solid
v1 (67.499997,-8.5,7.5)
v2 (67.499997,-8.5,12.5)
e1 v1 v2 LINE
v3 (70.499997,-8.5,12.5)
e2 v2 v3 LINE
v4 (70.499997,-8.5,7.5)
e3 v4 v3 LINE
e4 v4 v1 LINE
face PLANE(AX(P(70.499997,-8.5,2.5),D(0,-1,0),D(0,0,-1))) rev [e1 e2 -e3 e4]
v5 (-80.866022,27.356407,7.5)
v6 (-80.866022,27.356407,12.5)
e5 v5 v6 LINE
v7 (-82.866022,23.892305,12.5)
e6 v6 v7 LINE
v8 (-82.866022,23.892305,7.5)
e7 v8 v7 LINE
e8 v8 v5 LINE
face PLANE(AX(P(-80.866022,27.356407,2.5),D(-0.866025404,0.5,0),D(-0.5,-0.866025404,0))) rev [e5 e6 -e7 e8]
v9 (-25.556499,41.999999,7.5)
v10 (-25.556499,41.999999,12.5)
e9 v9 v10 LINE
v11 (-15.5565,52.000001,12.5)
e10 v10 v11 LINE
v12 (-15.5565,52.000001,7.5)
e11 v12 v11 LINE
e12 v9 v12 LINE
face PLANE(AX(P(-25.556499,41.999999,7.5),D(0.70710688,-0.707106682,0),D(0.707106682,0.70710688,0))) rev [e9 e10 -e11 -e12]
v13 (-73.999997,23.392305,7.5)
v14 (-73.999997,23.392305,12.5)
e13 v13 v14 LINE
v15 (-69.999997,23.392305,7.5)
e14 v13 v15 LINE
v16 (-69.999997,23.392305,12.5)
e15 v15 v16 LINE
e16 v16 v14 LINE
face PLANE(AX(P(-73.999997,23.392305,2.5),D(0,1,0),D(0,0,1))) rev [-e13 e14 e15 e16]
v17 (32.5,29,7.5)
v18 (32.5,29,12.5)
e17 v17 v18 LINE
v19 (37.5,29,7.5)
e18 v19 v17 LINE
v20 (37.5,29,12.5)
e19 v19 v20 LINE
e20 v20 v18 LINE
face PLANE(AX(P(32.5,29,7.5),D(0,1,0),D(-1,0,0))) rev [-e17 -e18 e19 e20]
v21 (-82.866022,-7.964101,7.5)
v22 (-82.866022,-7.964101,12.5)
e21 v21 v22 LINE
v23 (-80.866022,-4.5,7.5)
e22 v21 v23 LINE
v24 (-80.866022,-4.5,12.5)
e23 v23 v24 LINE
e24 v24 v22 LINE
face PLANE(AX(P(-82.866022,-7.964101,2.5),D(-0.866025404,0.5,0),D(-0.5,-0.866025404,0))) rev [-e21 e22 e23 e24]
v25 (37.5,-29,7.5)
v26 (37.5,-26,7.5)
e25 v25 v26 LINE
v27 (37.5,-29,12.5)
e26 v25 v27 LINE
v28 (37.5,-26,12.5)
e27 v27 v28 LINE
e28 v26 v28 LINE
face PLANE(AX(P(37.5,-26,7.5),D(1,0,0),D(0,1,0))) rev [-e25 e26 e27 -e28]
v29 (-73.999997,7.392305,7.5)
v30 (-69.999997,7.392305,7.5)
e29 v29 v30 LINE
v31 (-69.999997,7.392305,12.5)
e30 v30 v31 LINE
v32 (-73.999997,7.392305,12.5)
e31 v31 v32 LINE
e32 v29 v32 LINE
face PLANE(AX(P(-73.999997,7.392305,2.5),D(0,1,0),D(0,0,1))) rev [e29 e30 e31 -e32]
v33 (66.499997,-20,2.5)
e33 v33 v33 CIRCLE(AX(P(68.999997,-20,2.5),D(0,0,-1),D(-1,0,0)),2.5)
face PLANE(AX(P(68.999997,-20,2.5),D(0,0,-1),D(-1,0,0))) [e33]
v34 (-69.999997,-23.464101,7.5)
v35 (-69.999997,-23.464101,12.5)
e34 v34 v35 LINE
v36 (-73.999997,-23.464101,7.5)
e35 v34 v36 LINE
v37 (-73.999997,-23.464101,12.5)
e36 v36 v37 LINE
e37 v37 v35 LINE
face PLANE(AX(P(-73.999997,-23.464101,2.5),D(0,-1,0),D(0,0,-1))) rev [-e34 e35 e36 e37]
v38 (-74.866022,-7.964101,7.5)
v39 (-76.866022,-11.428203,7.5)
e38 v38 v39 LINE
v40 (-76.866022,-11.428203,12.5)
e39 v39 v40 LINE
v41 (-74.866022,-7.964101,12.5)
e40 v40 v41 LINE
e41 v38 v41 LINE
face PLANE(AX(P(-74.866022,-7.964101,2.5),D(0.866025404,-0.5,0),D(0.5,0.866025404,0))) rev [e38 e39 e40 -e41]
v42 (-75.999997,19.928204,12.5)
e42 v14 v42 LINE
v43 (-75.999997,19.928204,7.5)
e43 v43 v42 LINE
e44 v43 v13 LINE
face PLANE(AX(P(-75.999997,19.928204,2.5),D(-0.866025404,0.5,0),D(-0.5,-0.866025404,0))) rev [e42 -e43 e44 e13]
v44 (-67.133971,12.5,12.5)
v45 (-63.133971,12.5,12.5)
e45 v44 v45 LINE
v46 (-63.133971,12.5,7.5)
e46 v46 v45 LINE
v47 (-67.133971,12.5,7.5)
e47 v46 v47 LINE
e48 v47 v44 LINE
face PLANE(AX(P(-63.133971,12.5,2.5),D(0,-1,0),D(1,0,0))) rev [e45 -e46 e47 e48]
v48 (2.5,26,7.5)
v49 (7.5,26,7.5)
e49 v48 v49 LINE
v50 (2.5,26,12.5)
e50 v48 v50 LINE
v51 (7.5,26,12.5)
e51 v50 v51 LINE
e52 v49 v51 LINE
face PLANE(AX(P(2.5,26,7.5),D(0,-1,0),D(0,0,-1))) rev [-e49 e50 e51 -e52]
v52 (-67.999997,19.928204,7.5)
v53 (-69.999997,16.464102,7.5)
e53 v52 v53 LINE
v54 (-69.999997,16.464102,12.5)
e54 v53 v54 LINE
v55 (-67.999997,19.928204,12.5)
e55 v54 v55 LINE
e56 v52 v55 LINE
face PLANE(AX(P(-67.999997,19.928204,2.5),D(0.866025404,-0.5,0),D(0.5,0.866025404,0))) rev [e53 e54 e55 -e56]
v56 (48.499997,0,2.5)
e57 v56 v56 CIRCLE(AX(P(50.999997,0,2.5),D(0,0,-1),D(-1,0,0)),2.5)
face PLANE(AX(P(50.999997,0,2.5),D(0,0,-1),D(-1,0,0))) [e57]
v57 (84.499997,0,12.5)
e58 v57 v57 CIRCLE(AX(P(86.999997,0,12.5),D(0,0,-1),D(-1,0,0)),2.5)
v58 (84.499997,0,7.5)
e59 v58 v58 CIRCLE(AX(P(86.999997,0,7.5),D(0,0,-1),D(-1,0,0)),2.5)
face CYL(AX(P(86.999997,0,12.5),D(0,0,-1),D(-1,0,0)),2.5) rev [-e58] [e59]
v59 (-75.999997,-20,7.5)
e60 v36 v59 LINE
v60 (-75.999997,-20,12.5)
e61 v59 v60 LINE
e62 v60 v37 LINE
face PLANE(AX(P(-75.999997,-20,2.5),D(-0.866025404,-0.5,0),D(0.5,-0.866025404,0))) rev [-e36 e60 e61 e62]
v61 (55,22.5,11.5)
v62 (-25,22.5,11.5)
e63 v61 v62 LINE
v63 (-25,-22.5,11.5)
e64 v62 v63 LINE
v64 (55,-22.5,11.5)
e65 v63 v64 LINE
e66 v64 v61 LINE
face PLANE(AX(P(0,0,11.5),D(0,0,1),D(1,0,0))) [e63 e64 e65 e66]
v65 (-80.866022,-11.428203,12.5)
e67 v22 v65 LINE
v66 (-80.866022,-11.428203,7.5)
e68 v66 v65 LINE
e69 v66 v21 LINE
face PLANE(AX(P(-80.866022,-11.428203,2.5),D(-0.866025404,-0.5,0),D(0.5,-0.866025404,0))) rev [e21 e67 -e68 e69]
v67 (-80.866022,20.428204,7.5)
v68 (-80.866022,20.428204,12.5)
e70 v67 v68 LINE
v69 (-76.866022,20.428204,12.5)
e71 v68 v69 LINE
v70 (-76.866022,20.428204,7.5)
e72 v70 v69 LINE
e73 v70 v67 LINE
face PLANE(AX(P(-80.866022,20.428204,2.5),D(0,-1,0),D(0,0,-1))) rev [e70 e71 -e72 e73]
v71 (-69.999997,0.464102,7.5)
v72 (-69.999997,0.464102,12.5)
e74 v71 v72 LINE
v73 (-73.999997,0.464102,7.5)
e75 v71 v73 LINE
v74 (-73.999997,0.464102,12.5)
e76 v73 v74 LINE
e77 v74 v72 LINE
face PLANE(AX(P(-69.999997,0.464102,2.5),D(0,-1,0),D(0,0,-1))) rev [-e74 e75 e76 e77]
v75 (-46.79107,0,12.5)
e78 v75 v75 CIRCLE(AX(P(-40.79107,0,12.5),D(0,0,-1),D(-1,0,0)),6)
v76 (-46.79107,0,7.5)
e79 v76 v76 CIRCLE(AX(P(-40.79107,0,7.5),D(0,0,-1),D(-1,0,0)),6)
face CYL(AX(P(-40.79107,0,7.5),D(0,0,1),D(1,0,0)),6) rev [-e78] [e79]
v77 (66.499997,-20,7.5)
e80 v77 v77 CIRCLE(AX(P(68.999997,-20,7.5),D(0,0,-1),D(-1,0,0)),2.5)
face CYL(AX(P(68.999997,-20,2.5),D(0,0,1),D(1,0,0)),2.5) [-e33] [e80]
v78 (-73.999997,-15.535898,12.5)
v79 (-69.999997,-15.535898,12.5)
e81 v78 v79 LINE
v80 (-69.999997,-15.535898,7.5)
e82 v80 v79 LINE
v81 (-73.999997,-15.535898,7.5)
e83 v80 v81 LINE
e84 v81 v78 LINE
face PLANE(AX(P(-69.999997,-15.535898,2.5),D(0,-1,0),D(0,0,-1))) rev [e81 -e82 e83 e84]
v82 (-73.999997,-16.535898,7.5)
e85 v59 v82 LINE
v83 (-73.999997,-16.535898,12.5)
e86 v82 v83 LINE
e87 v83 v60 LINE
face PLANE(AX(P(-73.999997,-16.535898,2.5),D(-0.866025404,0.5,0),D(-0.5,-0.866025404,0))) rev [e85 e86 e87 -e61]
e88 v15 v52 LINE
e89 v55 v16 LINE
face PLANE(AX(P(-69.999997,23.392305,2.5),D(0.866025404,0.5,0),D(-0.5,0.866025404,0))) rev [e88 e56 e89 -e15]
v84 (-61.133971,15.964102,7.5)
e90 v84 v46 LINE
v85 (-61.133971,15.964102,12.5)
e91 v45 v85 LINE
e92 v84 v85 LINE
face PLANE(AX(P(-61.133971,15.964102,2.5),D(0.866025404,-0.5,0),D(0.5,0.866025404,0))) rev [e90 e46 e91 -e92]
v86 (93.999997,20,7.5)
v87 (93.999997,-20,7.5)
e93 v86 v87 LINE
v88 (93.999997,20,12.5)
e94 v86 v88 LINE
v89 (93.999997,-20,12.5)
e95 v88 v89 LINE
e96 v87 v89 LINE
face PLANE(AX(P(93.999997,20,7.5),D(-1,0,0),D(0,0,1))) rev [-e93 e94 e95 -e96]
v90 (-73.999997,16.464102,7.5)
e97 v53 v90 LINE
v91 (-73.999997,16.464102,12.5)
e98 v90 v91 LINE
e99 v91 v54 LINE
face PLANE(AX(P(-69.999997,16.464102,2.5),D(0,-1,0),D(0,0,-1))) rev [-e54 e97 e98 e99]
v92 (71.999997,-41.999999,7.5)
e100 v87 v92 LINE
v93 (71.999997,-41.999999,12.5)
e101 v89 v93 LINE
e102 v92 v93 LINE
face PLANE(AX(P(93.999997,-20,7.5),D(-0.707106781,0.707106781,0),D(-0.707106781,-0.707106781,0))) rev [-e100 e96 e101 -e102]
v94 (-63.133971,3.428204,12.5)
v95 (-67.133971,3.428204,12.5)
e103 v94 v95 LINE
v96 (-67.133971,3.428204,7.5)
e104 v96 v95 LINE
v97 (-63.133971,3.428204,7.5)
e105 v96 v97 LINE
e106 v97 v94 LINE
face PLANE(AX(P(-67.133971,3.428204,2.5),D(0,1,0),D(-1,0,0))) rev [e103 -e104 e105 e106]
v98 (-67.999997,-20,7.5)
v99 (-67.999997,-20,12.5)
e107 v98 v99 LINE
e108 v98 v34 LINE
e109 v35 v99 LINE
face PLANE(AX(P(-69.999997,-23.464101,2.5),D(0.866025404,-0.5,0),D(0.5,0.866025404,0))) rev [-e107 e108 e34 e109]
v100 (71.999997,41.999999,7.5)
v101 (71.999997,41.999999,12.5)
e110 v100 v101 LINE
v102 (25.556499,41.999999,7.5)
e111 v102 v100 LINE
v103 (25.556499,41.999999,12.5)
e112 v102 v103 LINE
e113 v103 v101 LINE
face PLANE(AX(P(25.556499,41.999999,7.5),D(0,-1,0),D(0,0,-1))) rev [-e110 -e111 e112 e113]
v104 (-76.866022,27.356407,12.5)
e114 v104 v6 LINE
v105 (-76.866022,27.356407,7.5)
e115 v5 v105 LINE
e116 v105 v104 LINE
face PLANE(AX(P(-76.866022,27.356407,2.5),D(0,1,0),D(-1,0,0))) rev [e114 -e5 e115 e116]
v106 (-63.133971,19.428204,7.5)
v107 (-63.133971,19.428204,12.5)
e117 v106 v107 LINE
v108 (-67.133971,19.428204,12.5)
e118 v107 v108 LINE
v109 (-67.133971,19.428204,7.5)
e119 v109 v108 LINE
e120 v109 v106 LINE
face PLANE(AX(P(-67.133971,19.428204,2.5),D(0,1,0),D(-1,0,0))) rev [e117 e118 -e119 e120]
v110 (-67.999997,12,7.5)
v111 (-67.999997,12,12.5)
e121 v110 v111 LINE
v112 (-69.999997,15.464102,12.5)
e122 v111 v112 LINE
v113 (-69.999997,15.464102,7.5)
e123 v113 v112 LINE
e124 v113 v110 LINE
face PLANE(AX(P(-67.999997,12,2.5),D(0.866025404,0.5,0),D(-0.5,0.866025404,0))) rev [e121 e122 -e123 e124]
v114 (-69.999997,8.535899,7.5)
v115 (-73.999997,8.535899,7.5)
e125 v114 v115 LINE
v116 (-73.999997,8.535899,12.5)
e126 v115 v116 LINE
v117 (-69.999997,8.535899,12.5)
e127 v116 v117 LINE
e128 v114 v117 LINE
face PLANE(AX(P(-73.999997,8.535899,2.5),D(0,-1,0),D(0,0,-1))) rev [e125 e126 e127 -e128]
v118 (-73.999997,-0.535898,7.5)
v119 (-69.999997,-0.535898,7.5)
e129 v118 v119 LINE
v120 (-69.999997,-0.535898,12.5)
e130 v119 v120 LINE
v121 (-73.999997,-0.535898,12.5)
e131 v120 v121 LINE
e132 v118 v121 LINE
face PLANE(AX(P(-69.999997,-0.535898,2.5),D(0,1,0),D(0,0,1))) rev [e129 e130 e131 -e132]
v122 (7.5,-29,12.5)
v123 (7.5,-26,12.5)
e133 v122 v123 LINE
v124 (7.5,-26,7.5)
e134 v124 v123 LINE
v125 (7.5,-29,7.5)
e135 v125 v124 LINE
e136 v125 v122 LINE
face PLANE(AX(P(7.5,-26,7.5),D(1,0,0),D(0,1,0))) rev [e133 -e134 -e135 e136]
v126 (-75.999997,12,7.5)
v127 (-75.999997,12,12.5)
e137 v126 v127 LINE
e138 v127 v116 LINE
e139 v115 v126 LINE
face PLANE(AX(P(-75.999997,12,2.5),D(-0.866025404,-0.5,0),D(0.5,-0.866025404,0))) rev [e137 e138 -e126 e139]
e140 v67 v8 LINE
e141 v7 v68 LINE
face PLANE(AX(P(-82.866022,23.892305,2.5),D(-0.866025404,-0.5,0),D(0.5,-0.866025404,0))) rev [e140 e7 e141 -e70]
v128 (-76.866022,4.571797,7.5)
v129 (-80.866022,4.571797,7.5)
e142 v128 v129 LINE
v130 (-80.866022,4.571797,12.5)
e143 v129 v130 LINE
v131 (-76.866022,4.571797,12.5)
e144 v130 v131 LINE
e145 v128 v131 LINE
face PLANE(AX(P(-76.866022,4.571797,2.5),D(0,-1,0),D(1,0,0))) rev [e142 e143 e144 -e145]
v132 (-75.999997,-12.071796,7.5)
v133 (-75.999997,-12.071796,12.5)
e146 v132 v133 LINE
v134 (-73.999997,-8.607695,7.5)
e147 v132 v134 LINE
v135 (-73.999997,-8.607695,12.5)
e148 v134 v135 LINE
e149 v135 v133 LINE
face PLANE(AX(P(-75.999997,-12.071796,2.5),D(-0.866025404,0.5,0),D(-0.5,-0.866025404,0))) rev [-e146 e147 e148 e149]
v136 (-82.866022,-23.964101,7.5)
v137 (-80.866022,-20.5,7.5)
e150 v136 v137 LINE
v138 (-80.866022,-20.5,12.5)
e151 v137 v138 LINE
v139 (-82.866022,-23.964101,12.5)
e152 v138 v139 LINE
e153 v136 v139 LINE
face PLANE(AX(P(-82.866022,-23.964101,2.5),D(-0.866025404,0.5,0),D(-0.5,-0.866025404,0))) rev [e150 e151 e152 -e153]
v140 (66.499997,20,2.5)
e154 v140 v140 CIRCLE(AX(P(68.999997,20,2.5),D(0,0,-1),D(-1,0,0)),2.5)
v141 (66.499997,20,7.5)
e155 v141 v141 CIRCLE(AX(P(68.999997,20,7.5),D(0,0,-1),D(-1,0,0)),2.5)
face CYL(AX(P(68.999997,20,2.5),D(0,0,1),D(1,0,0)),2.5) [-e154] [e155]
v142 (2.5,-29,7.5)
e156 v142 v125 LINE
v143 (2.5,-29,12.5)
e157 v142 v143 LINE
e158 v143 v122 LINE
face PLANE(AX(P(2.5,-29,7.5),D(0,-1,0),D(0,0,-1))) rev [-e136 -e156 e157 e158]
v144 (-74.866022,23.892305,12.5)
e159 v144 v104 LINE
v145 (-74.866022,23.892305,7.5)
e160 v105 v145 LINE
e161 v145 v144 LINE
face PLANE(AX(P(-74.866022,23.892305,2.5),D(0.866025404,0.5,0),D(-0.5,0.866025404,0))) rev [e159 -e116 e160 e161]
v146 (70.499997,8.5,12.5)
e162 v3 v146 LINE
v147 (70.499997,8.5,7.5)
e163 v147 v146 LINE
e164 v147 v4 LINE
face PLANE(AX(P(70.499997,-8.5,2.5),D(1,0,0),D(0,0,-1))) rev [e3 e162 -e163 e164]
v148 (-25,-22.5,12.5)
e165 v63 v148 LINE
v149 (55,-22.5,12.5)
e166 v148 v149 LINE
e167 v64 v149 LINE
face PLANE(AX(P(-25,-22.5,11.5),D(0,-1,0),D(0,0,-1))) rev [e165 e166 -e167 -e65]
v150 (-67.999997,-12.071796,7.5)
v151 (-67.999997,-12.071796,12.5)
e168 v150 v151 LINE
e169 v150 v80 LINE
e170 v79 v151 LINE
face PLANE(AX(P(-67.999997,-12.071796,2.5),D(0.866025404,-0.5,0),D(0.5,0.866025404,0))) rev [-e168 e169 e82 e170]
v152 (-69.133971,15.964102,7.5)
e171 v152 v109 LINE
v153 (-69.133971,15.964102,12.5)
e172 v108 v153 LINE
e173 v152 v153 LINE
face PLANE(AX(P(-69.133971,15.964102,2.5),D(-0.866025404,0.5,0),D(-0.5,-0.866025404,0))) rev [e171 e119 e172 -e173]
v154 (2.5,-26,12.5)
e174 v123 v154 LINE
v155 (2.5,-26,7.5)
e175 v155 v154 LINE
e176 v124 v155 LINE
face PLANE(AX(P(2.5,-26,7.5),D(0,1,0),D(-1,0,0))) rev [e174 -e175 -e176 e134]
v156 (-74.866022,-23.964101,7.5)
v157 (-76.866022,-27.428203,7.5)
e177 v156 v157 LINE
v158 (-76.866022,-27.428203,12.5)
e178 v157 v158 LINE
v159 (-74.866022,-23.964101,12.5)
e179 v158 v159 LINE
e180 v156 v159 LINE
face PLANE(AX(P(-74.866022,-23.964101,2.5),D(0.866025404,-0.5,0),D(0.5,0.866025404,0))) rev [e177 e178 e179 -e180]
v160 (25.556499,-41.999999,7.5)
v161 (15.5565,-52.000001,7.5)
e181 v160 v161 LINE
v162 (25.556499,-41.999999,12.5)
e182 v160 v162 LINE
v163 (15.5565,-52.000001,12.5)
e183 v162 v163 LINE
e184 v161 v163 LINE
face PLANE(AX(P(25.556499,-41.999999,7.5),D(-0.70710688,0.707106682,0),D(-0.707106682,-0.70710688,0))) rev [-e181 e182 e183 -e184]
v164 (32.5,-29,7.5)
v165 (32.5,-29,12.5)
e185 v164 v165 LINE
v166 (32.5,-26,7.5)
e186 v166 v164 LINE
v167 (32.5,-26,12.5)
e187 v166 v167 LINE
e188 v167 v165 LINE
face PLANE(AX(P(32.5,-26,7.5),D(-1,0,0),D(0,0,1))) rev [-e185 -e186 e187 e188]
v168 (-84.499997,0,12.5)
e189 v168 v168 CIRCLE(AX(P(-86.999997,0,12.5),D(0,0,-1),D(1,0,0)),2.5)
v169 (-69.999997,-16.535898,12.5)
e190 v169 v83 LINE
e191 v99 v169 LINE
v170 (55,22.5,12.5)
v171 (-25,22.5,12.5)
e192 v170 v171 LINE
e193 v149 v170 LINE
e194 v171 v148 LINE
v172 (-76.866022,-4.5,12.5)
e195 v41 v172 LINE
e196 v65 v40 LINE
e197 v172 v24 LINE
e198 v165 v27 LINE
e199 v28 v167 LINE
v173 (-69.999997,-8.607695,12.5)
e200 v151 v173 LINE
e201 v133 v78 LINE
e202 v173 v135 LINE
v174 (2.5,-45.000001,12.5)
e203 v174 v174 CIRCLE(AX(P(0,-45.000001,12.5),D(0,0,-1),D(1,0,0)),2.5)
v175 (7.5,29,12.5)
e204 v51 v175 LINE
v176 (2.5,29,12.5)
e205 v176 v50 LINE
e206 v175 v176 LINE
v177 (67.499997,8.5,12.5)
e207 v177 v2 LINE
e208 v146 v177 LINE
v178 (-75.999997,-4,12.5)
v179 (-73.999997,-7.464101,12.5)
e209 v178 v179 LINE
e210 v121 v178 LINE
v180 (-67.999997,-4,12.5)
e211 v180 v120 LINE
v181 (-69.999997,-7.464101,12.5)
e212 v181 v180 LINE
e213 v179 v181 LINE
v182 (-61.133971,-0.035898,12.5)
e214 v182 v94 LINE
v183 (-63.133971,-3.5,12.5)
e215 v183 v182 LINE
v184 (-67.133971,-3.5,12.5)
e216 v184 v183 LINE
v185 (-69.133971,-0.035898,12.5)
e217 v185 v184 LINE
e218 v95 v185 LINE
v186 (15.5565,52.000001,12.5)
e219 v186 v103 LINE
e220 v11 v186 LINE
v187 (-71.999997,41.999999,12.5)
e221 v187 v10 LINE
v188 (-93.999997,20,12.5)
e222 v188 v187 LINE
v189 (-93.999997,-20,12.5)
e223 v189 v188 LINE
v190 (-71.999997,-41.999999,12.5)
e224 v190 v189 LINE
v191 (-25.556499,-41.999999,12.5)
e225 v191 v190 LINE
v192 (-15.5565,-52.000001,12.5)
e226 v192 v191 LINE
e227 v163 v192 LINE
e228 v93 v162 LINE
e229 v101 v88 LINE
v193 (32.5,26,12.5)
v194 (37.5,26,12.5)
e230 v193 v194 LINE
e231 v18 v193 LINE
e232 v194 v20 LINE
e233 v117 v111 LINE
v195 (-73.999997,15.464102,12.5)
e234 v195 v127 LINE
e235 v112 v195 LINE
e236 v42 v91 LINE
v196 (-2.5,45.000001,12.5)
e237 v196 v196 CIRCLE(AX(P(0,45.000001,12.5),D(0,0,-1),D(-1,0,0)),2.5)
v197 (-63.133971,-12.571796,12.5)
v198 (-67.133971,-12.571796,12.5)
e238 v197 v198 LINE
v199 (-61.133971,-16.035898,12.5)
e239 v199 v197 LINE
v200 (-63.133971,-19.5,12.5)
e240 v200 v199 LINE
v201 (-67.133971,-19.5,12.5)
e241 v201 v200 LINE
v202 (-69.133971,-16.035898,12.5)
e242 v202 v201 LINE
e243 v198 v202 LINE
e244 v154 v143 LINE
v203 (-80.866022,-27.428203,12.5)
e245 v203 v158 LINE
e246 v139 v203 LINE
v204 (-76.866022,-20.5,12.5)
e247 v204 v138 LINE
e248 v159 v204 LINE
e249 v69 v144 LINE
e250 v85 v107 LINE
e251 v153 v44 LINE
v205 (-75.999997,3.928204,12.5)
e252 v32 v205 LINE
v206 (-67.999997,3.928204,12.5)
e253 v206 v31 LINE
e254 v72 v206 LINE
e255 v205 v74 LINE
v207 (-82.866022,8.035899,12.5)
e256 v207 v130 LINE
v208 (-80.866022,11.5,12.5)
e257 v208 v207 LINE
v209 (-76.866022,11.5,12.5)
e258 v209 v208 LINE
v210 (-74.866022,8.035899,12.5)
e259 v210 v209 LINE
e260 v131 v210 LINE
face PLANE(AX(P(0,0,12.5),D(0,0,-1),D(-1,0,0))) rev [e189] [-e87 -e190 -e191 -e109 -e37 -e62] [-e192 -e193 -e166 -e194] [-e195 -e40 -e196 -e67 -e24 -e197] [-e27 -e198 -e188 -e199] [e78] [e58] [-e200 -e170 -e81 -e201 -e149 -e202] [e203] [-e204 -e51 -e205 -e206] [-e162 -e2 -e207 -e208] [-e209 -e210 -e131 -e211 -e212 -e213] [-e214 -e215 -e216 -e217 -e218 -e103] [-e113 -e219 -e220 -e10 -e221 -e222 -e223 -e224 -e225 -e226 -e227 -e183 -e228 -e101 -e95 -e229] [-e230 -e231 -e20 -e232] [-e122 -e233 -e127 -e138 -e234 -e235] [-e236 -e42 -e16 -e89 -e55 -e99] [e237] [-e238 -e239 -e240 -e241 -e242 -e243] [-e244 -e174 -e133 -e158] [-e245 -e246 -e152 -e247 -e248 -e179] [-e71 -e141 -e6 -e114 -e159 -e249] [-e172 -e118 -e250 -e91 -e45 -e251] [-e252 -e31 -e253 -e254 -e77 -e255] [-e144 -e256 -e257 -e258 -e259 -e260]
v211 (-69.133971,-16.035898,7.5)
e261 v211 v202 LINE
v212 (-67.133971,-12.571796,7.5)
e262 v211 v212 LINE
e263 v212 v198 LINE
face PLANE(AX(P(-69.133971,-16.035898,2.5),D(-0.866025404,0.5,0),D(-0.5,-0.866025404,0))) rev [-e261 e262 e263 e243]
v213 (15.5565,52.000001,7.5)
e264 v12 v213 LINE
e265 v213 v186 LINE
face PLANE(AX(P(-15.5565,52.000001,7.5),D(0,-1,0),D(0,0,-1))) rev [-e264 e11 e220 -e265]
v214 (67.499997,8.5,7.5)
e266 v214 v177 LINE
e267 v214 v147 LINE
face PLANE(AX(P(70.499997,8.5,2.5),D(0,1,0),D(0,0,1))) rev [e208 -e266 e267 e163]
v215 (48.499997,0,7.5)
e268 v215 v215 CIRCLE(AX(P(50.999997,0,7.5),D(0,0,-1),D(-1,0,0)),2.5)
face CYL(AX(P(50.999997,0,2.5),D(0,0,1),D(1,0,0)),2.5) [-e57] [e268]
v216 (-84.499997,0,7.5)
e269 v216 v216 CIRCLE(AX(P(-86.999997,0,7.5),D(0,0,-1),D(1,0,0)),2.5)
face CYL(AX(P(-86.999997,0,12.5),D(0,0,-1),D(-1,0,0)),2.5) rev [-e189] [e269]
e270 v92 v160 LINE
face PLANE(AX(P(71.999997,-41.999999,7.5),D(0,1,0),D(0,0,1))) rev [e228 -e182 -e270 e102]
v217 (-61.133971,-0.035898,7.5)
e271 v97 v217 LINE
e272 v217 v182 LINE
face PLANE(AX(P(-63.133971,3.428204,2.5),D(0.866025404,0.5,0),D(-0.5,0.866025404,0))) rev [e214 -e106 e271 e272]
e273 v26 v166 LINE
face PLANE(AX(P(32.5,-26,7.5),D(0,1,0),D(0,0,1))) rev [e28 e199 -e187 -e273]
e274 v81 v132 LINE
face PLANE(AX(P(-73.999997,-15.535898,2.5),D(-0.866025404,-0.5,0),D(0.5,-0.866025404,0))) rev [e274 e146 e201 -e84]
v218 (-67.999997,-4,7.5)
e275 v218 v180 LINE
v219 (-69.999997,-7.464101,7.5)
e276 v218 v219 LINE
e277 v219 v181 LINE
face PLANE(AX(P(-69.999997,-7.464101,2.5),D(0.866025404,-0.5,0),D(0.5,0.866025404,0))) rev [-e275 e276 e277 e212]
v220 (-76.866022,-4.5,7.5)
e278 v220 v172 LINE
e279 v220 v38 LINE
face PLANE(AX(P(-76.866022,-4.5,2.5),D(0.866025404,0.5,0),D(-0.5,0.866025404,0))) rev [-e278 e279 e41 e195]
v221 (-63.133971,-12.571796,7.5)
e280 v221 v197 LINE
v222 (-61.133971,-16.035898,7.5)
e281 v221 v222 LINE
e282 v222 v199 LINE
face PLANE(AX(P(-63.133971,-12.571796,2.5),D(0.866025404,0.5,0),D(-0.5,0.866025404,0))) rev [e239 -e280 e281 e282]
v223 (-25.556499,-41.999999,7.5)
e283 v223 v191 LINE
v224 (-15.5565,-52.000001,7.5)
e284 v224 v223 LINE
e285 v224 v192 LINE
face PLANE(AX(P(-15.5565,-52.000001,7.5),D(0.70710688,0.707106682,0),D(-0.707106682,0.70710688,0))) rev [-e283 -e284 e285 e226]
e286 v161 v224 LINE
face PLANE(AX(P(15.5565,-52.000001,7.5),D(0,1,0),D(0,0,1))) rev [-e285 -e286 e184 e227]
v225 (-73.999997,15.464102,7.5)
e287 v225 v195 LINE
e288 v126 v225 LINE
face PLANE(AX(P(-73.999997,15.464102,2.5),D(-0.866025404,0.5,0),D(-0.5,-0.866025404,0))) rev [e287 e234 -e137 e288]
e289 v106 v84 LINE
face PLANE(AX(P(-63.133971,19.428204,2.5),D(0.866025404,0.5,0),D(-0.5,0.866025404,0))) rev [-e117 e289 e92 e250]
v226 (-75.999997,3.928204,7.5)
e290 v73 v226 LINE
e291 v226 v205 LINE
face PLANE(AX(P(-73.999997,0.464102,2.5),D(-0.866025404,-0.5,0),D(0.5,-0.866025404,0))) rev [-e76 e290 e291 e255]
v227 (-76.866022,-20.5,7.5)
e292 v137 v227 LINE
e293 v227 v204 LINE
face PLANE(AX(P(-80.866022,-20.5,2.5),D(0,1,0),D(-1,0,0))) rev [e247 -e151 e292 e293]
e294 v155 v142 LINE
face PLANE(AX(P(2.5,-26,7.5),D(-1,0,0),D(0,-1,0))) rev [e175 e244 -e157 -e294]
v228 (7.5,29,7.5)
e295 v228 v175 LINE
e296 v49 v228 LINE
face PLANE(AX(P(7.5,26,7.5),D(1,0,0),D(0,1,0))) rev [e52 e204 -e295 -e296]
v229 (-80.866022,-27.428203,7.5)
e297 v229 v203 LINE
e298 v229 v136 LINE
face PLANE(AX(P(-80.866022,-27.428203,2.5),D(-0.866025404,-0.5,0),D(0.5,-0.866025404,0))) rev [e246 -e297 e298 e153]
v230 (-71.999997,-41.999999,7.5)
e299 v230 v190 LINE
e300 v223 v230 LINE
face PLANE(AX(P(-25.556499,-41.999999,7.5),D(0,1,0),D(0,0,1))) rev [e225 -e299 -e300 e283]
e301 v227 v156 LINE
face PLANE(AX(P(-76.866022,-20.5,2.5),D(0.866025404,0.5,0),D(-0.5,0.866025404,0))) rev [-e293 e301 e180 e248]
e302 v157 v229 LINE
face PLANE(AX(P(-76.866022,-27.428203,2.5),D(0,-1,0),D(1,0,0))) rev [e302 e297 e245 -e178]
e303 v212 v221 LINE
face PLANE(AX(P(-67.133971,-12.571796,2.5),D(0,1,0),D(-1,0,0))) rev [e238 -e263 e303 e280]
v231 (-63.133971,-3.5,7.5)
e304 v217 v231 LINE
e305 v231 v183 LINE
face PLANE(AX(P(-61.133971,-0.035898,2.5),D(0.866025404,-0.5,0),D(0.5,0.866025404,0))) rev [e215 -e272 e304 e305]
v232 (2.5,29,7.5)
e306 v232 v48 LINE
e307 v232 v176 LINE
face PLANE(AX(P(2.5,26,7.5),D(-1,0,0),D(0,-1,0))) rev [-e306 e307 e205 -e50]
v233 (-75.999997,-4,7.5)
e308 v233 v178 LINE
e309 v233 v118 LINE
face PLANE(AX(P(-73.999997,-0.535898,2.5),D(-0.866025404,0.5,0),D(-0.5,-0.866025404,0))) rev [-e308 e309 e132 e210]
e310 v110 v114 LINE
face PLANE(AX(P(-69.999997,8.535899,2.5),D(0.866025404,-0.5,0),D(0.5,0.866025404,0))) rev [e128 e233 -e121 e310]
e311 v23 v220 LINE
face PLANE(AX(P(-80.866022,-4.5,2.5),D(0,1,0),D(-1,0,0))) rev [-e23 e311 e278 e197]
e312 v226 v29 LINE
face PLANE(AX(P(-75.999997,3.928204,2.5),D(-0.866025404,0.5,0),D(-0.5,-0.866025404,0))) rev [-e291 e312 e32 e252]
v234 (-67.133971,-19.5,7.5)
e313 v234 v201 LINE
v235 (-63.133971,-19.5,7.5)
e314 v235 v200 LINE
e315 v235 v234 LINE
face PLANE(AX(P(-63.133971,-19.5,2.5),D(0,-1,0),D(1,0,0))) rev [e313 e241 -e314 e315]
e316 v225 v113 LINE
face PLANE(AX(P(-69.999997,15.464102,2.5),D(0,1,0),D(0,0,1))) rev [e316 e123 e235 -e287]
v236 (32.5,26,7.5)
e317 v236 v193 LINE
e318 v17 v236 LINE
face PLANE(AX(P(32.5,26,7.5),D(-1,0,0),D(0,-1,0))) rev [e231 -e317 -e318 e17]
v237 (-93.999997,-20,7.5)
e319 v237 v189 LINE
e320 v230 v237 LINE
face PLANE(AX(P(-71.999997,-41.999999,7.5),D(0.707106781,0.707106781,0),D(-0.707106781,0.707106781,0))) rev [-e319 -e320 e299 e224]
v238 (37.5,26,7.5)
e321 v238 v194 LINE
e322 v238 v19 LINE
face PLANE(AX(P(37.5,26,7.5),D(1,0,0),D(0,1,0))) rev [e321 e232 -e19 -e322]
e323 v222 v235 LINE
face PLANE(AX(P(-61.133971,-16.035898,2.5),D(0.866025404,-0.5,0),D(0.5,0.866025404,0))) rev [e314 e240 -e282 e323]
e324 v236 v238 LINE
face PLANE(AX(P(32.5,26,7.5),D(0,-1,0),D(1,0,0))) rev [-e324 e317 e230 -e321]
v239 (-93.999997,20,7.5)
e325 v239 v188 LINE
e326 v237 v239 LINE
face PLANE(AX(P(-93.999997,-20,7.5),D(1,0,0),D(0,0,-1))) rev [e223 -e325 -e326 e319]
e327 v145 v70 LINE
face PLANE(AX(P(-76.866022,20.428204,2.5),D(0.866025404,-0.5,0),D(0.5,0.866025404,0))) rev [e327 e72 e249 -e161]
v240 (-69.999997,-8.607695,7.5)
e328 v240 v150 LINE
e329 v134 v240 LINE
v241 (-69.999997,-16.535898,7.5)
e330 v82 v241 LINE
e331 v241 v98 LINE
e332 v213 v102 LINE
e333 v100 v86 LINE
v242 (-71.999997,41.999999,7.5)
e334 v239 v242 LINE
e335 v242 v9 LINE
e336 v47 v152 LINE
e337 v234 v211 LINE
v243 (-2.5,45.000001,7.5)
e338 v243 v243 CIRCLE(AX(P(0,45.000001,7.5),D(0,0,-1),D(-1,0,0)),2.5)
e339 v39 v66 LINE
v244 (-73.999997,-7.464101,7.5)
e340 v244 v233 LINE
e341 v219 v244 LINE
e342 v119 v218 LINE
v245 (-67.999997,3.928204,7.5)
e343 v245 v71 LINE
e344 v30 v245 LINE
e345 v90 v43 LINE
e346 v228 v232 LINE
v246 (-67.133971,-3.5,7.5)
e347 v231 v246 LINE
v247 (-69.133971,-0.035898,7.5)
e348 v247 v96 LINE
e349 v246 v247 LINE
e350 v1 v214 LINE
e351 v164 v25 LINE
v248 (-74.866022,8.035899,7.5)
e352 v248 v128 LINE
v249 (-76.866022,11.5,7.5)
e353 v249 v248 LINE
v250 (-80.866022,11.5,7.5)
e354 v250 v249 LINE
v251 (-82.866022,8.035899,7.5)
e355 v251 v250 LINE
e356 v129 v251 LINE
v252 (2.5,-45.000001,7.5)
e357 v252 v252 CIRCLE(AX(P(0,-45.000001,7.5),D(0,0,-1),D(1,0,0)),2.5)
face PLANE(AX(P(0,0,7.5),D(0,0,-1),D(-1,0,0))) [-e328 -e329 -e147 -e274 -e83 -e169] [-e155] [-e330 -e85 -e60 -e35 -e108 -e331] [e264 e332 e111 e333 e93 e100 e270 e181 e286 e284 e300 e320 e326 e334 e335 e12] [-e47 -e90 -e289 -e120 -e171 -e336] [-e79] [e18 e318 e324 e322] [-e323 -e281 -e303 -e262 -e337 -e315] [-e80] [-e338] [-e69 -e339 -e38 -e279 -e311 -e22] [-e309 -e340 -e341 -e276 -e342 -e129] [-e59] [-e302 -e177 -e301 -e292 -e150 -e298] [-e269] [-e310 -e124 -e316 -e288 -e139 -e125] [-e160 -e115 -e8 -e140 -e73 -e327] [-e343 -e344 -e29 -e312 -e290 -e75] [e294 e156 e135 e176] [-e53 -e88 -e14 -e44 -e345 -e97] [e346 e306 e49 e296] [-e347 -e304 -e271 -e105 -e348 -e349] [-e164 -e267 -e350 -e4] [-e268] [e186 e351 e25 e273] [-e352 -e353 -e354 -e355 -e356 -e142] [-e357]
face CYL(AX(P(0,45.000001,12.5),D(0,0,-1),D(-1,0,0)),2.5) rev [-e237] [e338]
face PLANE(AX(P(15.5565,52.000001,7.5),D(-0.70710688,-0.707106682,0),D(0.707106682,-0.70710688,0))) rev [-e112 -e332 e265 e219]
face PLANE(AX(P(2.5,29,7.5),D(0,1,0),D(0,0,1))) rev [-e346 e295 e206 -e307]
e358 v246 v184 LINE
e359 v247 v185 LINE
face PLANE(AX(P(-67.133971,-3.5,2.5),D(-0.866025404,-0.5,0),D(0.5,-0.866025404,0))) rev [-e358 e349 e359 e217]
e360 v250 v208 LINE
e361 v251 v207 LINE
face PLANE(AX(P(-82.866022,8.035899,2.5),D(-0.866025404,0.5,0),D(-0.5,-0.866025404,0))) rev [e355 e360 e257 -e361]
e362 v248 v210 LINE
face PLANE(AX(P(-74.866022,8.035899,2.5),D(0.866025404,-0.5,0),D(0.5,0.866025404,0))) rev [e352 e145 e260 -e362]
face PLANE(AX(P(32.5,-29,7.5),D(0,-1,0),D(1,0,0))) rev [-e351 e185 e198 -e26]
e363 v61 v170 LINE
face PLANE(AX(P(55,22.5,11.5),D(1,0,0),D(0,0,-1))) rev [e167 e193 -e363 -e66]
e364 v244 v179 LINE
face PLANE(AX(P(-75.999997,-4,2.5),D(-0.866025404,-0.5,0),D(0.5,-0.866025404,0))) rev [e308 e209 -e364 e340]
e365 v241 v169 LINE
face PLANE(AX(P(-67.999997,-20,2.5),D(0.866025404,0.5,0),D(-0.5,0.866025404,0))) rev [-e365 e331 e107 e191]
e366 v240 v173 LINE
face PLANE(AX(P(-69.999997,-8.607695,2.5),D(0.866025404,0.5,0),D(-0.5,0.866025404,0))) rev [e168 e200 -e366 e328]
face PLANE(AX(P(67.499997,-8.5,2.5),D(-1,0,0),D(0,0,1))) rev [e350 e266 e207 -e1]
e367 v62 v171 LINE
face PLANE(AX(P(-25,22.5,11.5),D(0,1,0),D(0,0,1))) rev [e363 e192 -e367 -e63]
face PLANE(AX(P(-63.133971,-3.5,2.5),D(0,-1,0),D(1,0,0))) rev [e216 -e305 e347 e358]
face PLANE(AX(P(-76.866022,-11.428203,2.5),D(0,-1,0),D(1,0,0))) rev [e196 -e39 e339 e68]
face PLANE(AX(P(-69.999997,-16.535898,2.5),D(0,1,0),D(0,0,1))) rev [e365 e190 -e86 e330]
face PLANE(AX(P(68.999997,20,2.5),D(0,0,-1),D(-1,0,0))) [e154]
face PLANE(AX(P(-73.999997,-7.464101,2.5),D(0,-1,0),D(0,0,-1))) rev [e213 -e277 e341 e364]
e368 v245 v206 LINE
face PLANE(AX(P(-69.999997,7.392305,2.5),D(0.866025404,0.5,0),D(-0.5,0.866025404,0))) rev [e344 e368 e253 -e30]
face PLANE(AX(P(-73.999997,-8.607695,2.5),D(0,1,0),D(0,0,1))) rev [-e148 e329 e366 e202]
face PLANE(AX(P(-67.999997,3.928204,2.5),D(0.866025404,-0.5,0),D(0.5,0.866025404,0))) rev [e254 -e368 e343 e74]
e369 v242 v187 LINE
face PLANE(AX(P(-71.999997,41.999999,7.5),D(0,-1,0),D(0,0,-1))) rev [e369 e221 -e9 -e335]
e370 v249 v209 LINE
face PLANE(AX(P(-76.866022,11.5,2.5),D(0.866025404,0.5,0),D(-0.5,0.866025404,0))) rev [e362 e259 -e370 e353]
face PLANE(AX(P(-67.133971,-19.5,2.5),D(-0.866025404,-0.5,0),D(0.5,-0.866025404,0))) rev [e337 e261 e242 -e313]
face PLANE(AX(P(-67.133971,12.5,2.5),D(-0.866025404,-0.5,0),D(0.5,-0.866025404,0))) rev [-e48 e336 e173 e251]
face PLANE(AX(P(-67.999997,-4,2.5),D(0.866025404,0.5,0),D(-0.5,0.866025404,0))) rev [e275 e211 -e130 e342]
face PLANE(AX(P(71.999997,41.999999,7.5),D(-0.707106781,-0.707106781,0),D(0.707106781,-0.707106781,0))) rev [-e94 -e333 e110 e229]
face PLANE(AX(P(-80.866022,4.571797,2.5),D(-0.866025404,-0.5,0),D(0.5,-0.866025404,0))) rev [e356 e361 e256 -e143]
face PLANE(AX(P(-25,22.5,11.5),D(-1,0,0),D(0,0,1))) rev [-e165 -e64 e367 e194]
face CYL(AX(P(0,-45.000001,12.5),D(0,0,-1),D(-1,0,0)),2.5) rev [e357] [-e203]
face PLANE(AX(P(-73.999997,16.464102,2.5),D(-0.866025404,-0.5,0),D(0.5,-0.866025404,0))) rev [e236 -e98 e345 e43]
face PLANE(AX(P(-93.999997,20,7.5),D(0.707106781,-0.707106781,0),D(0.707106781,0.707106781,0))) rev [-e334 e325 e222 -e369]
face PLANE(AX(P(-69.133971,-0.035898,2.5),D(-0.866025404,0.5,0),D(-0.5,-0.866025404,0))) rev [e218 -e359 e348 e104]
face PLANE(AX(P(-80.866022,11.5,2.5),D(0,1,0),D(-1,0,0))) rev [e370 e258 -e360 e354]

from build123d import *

# Parameters (mm, degrees)
BASE_FLANGE1_OUTLINE_R  = 6
BASE_FLANGE1_DEPTH      = 5
SKETCH3_W               = 80
SKETCH3_H               = 45
CUT_EXTRUDE1_DEPTH      = 1
CROQUIS1_W              = 5
CROQUIS1_H              = 3
CORTAR_EXTRUIR1_DEPTH   = 108.540687679
CROQUIS2_R              = 2.5
CORTAR_EXTRUIR2_DEPTH   = 108.540687679
CROQUIS3_R              = 2.5
SALIENTE_EXTRUIR1_DEPTH = 5
CUT_EXTRUDE3_DEPTH      = 10
SKETCH9_W               = 3
SKETCH9_H               = 17
CUT_EXTRUDE4_DEPTH      = 10


# Read off the part's stored shape, not the designer's step: Base-Flange1
with BuildPart() as part:
    # Base-Flange1 outline → Base-Flange1 (new body)
    with BuildSketch(Plane(origin=(0, 0, 12.500000186), x_dir=(-1, 0, 0), z_dir=(0, 0, -1))):
        Polygon((-93.999996781, 19.999999553), (-93.999996781, -19.999999553), (-71.999996901, -41.999999434), (-25.556499138, -41.999999434), (-15.556500293, -52.000001073), (15.556500293, -52.000001073), (25.556499138, -41.999999434), (71.999996901, -41.999999434), (93.999996781, -19.999999553), (93.999996781, 19.999999553), (71.999996901, 41.999999434), (25.556499138, 41.999999434), (15.556500293, 52.000001073), (-15.556500293, 52.000001073), (-25.556499138, 41.999999434), (-71.999996901, 41.999999434), align=None)
        with Locations((40.791069868, 0)):
            Circle(BASE_FLANGE1_OUTLINE_R, mode=Mode.SUBTRACT)
    extrude(amount=BASE_FLANGE1_DEPTH)

    # Sketch3 → Cut-Extrude1 (cut)
    with BuildSketch(Plane.XY.offset(12.500000186)):
        with Locations((15, 0)):
            Rectangle(SKETCH3_W, SKETCH3_H)
    extrude(amount=-CUT_EXTRUDE1_DEPTH, mode=Mode.SUBTRACT)

    # Croquis1 → Cortar-Extruir1 (cut, through all)
    with BuildSketch(Plane.XY.offset(12.500000186)):
        with Locations((5, 27.5)):
            Rectangle(CROQUIS1_W, CROQUIS1_H)
        with Locations((35, 27.5)):
            Rectangle(CROQUIS1_W, CROQUIS1_H)
        with Locations((35, -27.5)):
            Rectangle(CROQUIS1_W, CROQUIS1_H)
        with Locations((5, -27.5)):
            Rectangle(CROQUIS1_W, CROQUIS1_H)
    extrude(amount=-CORTAR_EXTRUIR1_DEPTH, mode=Mode.SUBTRACT)

    # Croquis2 → Cortar-Extruir2 (cut, through all)
    with BuildSketch(Plane(origin=(0, 0, 7.500000186), x_dir=(-1, 0, 0), z_dir=(0, 0, -1))):
        with Locations((-86.999996781, 0)):
            Circle(CROQUIS2_R)
        with Locations(Location((86.999996781, 0, 0), (0, 0, 180))):
            Circle(CROQUIS2_R)
        with Locations((0, 45.000001073)):
            Circle(CROQUIS2_R)
        with Locations(Location((0, -45.000001073, 0), (0, 0, 180))):
            Circle(CROQUIS2_R)
    extrude(amount=-CORTAR_EXTRUIR2_DEPTH, mode=Mode.SUBTRACT)

    # Croquis3 → Saliente-Extruir1 (add)
    with BuildSketch(Plane(origin=(0, 0, 7.500000186), x_dir=(-1, 0, 0), z_dir=(0, 0, -1))):
        with Locations((-50.999996781, 0)):
            Circle(CROQUIS3_R)
        with Locations((-68.999996781, 20)):
            Circle(CROQUIS3_R)
        with Locations((-68.999996781, -20)):
            Circle(CROQUIS3_R)
    extrude(amount=SALIENTE_EXTRUIR1_DEPTH)

    # Sketch8 → Cut-Extrude3 (cut)
    with BuildSketch(Plane.XY.offset(12.500000186)):
        Polygon((-67.999996901, -19.999999553), (-69.999996901, -16.535897938), (-73.999996901, -16.535897938), (-75.999996901, -19.999999553), (-73.999996901, -23.464101168), (-69.999996901, -23.464101168), align=None)
        Polygon((-69.999996901, -8.607694708), (-67.999996901, -12.071796323), (-69.999996901, -15.535897938), (-73.999996901, -15.535897938), (-75.999996901, -12.071796323), (-73.999996901, -8.607694708), align=None)
        Polygon((-63.133971497, -19.499999553), (-67.133971497, -19.499999553), (-69.133971497, -16.035897938), (-67.133971497, -12.571796323), (-63.133971497, -12.571796323), (-61.133971497, -16.035897938), align=None)
        Polygon((-67.999996901, -3.999999553), (-69.999996901, -0.535897938), (-73.999996901, -0.535897938), (-75.999996901, -3.999999553), (-73.999996901, -7.464101168), (-69.999996901, -7.464101168), align=None)
        Polygon((-76.866022304, -27.428202783), (-80.866022304, -27.428202783), (-82.866022304, -23.964101168), (-80.866022304, -20.499999553), (-76.866022304, -20.499999553), (-74.866022304, -23.964101168), align=None)
        Polygon((-69.999996901, 7.392305292), (-67.999996901, 3.928203677), (-69.999996901, 0.464102062), (-73.999996901, 0.464102062), (-75.999996901, 3.928203677), (-73.999996901, 7.392305292), align=None)
        Polygon((-63.133971497, -3.499999553), (-67.133971497, -3.499999553), (-69.133971497, -0.035897938), (-67.133971497, 3.428203677), (-63.133971497, 3.428203677), (-61.133971497, -0.035897938), align=None)
        Polygon((-76.866022304, -11.428202783), (-80.866022304, -11.428202783), (-82.866022304, -7.964101168), (-80.866022304, -4.499999553), (-76.866022304, -4.499999553), (-74.866022304, -7.964101168), align=None)
        Polygon((-67.999996901, 12.000000447), (-69.999996901, 15.464102062), (-73.999996901, 15.464102062), (-75.999996901, 12.000000447), (-73.999996901, 8.535898832), (-69.999996901, 8.535898832), align=None)
        Polygon((-69.999996901, 23.392305292), (-67.999996901, 19.928203677), (-69.999996901, 16.464102062), (-73.999996901, 16.464102062), (-75.999996901, 19.928203677), (-73.999996901, 23.392305292), align=None)
        Polygon((-63.133971497, 12.500000447), (-67.133971497, 12.500000447), (-69.133971497, 15.964102062), (-67.133971497, 19.428203677), (-63.133971497, 19.428203677), (-61.133971497, 15.964102062), align=None)
        Polygon((-76.866022304, 4.571797217), (-80.866022304, 4.571797217), (-82.866022304, 8.035898832), (-80.866022304, 11.500000447), (-76.866022304, 11.500000447), (-74.866022304, 8.035898832), align=None)
        Polygon((-74.866022304, 23.892305292), (-76.866022304, 27.356406908), (-80.866022304, 27.356406908), (-82.866022304, 23.892305292), (-80.866022304, 20.428203677), (-76.866022304, 20.428203677), align=None)
    extrude(amount=-CUT_EXTRUDE3_DEPTH, mode=Mode.SUBTRACT)

    # Sketch9 → Cut-Extrude4 (cut)
    with BuildSketch(Plane.XY.offset(12.500000186)):
        with Locations((68.999996781, 0)):
            Rectangle(SKETCH9_W, SKETCH9_H)
    extrude(amount=-CUT_EXTRUDE4_DEPTH, mode=Mode.SUBTRACT)


solid = part.part
